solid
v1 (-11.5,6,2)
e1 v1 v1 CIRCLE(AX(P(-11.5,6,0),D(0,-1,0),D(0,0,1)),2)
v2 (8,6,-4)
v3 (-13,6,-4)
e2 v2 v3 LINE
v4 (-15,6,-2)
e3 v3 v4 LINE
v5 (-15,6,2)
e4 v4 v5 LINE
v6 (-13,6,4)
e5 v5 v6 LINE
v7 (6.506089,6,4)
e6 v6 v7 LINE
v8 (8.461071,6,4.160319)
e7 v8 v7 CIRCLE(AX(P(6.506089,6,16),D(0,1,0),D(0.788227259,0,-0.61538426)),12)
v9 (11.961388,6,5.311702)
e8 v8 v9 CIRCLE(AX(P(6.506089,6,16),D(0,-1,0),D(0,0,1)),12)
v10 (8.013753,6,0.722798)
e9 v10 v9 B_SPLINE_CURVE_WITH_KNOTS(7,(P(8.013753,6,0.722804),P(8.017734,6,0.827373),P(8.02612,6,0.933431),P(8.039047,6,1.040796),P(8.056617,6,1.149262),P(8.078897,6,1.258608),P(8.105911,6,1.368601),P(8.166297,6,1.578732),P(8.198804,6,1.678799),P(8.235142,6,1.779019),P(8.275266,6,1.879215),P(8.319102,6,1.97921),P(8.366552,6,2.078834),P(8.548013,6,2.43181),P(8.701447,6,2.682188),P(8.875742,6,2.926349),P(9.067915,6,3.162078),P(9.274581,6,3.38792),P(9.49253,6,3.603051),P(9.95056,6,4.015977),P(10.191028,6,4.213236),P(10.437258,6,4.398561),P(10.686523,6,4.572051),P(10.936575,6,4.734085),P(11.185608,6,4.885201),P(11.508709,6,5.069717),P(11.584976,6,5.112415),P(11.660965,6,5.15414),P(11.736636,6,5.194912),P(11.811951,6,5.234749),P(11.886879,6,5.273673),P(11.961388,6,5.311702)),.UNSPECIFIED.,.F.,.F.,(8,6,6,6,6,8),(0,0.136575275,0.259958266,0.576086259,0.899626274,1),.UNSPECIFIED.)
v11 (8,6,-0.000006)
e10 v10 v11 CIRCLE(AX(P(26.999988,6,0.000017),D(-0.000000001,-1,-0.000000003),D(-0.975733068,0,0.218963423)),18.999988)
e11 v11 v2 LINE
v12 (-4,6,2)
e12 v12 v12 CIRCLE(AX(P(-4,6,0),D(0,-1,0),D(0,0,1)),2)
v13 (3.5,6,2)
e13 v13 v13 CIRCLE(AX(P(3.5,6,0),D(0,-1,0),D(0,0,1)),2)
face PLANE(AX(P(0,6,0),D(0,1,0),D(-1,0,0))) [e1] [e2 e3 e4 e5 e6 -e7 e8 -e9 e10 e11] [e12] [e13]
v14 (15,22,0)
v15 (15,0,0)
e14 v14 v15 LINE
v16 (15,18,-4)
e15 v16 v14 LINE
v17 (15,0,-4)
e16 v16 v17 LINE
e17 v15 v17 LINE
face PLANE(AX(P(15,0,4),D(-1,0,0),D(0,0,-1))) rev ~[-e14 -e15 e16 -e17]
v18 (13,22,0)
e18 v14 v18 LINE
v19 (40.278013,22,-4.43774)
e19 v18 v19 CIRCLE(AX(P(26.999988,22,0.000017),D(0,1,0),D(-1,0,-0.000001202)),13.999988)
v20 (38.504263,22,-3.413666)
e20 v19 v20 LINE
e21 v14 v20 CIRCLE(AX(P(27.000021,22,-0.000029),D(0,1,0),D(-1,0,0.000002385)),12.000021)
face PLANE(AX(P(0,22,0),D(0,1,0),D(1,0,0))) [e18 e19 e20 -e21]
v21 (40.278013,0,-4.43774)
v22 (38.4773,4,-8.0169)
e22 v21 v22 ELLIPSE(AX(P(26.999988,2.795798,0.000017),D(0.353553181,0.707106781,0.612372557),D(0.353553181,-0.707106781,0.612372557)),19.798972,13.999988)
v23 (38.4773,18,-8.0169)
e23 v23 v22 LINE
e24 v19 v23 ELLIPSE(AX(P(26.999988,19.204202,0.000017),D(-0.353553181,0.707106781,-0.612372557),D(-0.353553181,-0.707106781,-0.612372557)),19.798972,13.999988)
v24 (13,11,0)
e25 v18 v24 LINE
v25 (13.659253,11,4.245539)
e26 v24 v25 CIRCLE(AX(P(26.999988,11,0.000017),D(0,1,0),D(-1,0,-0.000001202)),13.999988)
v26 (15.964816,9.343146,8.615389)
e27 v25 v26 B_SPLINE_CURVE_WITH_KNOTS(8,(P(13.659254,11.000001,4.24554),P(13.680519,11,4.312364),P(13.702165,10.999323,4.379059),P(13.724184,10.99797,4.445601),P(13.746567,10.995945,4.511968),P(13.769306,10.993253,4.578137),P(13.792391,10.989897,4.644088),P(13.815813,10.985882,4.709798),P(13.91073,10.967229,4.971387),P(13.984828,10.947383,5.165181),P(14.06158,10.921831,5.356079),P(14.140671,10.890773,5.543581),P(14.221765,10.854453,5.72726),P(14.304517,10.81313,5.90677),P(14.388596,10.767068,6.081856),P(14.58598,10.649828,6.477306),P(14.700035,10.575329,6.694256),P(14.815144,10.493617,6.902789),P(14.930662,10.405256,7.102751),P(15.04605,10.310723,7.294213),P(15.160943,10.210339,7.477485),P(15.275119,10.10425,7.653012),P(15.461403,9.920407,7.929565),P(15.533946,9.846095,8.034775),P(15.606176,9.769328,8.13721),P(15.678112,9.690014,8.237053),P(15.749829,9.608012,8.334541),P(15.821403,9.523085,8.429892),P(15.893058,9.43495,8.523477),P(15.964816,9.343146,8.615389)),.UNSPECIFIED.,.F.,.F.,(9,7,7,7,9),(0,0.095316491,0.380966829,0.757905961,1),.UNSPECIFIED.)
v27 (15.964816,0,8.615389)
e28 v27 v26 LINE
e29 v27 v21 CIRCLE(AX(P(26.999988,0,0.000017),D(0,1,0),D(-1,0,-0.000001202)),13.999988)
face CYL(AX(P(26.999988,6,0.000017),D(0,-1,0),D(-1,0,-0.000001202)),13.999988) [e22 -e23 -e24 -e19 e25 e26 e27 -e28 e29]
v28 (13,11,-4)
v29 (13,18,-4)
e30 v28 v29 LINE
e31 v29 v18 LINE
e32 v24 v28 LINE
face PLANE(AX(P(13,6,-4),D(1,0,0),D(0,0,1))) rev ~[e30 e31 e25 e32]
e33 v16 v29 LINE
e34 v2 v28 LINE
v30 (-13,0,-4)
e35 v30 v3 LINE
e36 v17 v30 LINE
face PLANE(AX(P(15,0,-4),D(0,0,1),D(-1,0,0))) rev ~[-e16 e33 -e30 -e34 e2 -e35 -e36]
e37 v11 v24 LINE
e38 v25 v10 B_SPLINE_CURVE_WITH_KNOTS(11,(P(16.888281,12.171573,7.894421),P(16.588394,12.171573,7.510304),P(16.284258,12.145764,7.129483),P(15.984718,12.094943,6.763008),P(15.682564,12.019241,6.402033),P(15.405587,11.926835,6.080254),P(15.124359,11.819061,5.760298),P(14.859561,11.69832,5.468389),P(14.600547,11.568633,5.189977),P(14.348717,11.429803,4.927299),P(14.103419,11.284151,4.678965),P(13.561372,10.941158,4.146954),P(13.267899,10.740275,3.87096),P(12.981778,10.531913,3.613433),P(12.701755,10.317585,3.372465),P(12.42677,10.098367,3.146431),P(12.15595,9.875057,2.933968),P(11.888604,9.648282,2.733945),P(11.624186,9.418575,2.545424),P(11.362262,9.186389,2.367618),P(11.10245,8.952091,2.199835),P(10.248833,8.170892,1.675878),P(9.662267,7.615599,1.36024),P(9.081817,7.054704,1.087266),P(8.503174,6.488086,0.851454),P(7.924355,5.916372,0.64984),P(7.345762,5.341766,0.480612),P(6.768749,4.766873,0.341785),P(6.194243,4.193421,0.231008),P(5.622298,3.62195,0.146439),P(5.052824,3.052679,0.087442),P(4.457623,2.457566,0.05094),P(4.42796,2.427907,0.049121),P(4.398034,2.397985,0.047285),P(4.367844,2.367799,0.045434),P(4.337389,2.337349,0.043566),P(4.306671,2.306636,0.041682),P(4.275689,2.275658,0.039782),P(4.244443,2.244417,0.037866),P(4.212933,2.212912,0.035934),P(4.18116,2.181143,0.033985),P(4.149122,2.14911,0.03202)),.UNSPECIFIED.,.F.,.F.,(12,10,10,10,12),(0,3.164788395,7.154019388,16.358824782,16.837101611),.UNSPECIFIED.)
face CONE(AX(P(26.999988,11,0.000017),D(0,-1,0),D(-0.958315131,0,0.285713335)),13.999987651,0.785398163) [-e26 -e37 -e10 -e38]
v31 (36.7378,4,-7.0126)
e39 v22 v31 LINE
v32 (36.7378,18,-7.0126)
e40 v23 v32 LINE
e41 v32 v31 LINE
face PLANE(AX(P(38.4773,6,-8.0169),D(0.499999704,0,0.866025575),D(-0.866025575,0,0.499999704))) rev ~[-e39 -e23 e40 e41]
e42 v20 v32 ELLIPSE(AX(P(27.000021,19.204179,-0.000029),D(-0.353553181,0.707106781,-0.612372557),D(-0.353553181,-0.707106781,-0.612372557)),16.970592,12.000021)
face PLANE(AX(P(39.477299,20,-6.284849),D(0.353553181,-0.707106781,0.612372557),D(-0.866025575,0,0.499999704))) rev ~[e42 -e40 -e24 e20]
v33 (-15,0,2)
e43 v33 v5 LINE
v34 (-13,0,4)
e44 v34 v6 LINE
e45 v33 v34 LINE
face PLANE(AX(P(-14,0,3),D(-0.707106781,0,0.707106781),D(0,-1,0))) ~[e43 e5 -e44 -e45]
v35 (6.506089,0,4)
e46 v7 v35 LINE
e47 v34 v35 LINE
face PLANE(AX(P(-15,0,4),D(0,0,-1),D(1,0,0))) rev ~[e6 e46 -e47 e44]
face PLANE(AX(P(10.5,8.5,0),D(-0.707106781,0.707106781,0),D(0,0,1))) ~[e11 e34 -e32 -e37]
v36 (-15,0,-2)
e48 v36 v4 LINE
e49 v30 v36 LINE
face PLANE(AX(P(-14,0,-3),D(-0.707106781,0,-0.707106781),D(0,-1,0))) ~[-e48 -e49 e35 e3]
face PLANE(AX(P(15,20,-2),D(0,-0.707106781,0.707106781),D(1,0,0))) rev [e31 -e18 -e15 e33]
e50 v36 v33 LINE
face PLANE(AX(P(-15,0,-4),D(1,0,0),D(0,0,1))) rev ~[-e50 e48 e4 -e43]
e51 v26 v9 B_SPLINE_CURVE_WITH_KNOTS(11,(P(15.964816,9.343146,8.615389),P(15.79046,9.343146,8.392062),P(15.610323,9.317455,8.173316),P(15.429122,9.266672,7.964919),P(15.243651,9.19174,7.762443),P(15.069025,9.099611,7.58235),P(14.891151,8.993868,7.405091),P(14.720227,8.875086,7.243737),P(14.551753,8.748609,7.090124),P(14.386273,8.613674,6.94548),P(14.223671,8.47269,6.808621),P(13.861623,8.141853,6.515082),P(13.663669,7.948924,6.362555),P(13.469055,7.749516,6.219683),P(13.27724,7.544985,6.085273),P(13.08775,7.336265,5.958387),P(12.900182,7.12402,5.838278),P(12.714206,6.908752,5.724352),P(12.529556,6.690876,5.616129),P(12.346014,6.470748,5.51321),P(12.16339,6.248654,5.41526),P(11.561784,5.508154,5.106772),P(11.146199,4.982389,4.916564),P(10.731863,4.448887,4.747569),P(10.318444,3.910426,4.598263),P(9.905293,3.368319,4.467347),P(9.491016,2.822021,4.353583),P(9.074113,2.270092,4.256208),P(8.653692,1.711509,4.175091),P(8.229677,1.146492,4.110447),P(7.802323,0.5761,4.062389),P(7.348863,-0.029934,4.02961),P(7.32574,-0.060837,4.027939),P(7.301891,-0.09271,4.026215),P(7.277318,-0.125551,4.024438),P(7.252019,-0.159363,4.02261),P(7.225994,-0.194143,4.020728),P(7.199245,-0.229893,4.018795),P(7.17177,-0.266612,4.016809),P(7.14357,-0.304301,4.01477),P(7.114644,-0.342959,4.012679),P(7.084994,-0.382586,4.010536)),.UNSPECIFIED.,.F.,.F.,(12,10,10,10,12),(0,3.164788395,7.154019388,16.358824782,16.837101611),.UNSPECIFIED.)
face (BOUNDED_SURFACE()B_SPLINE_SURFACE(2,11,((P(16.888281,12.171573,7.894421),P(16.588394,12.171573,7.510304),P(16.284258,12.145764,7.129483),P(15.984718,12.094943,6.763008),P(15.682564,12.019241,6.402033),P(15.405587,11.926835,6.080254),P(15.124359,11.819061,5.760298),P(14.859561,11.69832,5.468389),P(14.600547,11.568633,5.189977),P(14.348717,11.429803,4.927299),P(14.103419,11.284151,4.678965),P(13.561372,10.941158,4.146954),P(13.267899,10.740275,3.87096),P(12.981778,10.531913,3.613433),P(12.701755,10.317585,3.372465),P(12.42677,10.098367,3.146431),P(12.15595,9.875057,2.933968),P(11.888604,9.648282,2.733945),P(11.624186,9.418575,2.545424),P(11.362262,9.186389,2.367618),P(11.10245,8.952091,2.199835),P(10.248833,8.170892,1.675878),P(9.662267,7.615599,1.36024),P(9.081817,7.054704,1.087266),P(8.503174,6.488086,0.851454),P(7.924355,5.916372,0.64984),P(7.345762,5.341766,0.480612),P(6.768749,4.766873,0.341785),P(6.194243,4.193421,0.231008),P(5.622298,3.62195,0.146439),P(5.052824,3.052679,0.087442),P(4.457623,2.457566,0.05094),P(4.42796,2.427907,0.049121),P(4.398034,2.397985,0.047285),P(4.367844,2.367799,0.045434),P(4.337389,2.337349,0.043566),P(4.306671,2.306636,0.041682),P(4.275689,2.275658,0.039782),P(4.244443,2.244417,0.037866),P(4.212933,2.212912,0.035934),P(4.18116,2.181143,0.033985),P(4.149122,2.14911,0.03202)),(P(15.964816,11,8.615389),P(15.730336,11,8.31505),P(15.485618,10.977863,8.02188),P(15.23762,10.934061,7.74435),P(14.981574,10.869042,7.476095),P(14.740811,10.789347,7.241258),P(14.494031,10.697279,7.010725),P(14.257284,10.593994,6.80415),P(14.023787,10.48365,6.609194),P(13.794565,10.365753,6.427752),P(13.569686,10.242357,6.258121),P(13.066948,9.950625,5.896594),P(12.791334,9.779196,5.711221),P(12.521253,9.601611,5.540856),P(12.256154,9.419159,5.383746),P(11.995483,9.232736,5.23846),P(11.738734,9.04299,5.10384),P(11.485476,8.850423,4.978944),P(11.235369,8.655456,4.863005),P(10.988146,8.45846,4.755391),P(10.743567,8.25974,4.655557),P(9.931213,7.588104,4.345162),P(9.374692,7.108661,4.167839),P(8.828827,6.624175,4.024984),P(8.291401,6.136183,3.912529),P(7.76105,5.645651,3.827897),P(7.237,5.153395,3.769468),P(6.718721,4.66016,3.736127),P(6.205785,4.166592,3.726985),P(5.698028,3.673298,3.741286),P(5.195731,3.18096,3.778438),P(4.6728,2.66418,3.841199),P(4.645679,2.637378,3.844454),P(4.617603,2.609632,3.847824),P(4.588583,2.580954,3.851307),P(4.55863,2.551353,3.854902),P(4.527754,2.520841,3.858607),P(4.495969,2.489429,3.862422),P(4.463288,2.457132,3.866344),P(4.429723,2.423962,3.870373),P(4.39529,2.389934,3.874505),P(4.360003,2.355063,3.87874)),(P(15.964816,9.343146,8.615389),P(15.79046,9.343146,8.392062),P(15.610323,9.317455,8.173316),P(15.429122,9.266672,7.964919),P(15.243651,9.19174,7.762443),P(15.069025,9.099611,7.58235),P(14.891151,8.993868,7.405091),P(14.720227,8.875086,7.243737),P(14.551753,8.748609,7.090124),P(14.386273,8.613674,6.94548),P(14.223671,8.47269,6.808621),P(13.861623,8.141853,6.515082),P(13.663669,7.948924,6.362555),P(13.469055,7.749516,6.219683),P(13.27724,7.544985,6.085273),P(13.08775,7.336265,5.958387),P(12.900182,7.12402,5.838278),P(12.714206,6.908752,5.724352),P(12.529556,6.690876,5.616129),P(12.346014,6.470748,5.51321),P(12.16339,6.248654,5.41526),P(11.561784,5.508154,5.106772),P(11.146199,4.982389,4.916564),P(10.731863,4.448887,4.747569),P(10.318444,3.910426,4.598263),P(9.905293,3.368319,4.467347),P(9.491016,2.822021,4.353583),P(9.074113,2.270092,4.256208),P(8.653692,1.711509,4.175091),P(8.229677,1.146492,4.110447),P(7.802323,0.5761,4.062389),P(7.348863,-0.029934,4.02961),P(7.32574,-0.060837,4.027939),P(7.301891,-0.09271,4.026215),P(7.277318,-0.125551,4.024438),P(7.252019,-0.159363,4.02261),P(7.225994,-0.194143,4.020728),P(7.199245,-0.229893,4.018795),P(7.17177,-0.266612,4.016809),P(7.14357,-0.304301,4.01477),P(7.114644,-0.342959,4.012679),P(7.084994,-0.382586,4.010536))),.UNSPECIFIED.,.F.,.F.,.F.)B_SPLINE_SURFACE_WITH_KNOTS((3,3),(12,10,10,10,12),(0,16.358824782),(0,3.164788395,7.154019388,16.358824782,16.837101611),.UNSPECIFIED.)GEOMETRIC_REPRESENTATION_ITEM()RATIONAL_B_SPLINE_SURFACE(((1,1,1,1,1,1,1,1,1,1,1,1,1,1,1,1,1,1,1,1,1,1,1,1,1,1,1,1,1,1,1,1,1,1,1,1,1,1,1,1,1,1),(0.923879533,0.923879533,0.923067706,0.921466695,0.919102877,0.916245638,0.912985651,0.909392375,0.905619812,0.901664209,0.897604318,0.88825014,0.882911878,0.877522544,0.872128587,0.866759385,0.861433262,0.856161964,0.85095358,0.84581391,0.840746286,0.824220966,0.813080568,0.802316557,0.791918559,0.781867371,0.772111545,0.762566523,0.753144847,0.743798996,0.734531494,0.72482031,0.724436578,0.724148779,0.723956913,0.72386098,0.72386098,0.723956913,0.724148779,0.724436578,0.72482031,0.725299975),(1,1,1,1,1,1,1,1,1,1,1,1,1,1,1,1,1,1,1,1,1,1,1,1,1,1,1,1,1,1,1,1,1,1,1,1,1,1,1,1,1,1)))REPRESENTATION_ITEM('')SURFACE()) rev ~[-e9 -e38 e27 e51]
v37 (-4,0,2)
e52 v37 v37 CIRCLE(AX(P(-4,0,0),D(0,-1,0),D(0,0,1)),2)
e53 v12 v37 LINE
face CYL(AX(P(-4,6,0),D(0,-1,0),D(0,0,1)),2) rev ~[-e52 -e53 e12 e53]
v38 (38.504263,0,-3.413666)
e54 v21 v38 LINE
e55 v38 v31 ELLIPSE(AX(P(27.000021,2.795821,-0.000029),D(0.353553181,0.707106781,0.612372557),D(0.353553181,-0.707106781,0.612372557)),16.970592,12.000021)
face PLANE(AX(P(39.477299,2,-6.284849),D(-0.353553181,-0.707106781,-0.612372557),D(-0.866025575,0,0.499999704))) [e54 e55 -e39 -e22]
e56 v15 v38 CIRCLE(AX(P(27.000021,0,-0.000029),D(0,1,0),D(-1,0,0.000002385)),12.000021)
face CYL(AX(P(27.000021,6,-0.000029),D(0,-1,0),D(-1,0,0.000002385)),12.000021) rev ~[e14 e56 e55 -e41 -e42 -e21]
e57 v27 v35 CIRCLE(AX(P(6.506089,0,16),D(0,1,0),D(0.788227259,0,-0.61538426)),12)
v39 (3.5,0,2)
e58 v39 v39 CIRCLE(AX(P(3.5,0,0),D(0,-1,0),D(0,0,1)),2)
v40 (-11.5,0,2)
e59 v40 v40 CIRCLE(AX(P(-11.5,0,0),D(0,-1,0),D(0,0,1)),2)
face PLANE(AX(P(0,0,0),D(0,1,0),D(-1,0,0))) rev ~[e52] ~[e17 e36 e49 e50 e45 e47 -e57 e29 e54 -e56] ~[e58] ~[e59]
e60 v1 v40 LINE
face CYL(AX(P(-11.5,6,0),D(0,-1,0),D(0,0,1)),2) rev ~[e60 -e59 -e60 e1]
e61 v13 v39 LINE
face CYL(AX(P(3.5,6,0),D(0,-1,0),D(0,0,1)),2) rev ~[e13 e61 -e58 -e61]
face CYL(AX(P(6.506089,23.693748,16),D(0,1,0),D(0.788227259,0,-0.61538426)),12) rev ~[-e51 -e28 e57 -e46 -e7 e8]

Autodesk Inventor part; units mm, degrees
ref_plane "YZ Plane" through (0, 0, 0) normal (1, 0, 0) x (0, 1, 0)
ref_plane "XZ Plane" through (0, 0, 0) normal (0, 1, 0) x (-1, 0, 0)
ref_plane "XY Plane" through (0, 0, 0) normal (0, 0, 1) x (1, 0, 0)
sketch "Sketch1" plane through (0, 0, 0) normal (0, 1, 0) x (-1, 0, 0)
  line L0 (15, 4) -> (-15, 4)
  line L1 (-15, 4) -> (-15, -4)
  line L2 (-15, -4) -> (15, -4)
  line L3 (15, -4) -> (15, 4)
  line L4 (15, 4) -> (-15, -4) construction
  line L5 (-15, 4) -> (15, -4) construction
  point P0 (0, 0)
  dimension "d0" = 8
  dimension "d1" = 30
extrude "Extrusion1" add sketch "Sketch1" along normal blind 6
sketch "Sketch2" plane through (0, 6, 0) normal (0, 1, 0) x (1, 0, 0)
  line L0 (15, -4) -> (15, 4) projected
  line L1 (15, 4) -> (-15, 4) projected
  line L2 (-15, 4) -> (-15, -4) projected
  line L3 (-15, -4) -> (15, -4) projected
  point P0 (0, 0)
  point P1 (-4, 0)
  point P2 (-11.5, 0)
  point P3 (3.5, 0)
  dimension "d4" = 7.5
  dimension "d5" = 11
  dimension "d14" = 7.5
hole "Hole1" at (-4, 6, 0) at (-11.5, 6, 0) at (3.5, 6, 0) direction (0, -1, 0) diameter 4 end through all
sketch "Sketch3" plane through (0, 6, 0) normal (0, 1, 0) x (1, 0, 0)
  line L0 (15, -4) -> (15, 4) projected
  arc A0 (15, 0) -> (36.7378, 7.0126) centre (27, 0) ccw
  arc A1 (13, 0) -> (38.4773, 8.0169) centre (27, 0) ccw
  line L1 (38.4773, 8.0169) -> (36.7378, 7.0126)
  line L2 (15, 0) -> (15, 4)
  line L3 (15, 4) -> (-15, 4) projected
  line L4 (13, 4) -> (13, 0)
  point P0 (0, 0)
  dimension "d15" = 2
  dimension "d16" = 0
  dimension "d17" = 60
  dimension "d22" = 12
extrude "Extrusion2" add sketch "Sketch3" along normal blind 16 and the other way blind 6
chamfer "Chamfer1" distance 5 angle 45 2 edges at (13, 6, -2) (13.1467, 6, 2.0212)
chamfer "Chamfer2" distance 2 angle 45 2 edges at (-15, 3, 4) (-15, 3, -4)
chamfer "Chamfer3" distance 4 angle 45 3 edges at (14, 22, -4) (37.6076, 22, -7.5147) (37.6076, 0, -7.5147)
fillet "Fillet1" radius 12 1 edges at (13.5836, 3, 4)
fillet "Fillet2" radius 4 1 edges at (11.865, 8.9761, 5.2631)
properties part number "squirrely_leg"
